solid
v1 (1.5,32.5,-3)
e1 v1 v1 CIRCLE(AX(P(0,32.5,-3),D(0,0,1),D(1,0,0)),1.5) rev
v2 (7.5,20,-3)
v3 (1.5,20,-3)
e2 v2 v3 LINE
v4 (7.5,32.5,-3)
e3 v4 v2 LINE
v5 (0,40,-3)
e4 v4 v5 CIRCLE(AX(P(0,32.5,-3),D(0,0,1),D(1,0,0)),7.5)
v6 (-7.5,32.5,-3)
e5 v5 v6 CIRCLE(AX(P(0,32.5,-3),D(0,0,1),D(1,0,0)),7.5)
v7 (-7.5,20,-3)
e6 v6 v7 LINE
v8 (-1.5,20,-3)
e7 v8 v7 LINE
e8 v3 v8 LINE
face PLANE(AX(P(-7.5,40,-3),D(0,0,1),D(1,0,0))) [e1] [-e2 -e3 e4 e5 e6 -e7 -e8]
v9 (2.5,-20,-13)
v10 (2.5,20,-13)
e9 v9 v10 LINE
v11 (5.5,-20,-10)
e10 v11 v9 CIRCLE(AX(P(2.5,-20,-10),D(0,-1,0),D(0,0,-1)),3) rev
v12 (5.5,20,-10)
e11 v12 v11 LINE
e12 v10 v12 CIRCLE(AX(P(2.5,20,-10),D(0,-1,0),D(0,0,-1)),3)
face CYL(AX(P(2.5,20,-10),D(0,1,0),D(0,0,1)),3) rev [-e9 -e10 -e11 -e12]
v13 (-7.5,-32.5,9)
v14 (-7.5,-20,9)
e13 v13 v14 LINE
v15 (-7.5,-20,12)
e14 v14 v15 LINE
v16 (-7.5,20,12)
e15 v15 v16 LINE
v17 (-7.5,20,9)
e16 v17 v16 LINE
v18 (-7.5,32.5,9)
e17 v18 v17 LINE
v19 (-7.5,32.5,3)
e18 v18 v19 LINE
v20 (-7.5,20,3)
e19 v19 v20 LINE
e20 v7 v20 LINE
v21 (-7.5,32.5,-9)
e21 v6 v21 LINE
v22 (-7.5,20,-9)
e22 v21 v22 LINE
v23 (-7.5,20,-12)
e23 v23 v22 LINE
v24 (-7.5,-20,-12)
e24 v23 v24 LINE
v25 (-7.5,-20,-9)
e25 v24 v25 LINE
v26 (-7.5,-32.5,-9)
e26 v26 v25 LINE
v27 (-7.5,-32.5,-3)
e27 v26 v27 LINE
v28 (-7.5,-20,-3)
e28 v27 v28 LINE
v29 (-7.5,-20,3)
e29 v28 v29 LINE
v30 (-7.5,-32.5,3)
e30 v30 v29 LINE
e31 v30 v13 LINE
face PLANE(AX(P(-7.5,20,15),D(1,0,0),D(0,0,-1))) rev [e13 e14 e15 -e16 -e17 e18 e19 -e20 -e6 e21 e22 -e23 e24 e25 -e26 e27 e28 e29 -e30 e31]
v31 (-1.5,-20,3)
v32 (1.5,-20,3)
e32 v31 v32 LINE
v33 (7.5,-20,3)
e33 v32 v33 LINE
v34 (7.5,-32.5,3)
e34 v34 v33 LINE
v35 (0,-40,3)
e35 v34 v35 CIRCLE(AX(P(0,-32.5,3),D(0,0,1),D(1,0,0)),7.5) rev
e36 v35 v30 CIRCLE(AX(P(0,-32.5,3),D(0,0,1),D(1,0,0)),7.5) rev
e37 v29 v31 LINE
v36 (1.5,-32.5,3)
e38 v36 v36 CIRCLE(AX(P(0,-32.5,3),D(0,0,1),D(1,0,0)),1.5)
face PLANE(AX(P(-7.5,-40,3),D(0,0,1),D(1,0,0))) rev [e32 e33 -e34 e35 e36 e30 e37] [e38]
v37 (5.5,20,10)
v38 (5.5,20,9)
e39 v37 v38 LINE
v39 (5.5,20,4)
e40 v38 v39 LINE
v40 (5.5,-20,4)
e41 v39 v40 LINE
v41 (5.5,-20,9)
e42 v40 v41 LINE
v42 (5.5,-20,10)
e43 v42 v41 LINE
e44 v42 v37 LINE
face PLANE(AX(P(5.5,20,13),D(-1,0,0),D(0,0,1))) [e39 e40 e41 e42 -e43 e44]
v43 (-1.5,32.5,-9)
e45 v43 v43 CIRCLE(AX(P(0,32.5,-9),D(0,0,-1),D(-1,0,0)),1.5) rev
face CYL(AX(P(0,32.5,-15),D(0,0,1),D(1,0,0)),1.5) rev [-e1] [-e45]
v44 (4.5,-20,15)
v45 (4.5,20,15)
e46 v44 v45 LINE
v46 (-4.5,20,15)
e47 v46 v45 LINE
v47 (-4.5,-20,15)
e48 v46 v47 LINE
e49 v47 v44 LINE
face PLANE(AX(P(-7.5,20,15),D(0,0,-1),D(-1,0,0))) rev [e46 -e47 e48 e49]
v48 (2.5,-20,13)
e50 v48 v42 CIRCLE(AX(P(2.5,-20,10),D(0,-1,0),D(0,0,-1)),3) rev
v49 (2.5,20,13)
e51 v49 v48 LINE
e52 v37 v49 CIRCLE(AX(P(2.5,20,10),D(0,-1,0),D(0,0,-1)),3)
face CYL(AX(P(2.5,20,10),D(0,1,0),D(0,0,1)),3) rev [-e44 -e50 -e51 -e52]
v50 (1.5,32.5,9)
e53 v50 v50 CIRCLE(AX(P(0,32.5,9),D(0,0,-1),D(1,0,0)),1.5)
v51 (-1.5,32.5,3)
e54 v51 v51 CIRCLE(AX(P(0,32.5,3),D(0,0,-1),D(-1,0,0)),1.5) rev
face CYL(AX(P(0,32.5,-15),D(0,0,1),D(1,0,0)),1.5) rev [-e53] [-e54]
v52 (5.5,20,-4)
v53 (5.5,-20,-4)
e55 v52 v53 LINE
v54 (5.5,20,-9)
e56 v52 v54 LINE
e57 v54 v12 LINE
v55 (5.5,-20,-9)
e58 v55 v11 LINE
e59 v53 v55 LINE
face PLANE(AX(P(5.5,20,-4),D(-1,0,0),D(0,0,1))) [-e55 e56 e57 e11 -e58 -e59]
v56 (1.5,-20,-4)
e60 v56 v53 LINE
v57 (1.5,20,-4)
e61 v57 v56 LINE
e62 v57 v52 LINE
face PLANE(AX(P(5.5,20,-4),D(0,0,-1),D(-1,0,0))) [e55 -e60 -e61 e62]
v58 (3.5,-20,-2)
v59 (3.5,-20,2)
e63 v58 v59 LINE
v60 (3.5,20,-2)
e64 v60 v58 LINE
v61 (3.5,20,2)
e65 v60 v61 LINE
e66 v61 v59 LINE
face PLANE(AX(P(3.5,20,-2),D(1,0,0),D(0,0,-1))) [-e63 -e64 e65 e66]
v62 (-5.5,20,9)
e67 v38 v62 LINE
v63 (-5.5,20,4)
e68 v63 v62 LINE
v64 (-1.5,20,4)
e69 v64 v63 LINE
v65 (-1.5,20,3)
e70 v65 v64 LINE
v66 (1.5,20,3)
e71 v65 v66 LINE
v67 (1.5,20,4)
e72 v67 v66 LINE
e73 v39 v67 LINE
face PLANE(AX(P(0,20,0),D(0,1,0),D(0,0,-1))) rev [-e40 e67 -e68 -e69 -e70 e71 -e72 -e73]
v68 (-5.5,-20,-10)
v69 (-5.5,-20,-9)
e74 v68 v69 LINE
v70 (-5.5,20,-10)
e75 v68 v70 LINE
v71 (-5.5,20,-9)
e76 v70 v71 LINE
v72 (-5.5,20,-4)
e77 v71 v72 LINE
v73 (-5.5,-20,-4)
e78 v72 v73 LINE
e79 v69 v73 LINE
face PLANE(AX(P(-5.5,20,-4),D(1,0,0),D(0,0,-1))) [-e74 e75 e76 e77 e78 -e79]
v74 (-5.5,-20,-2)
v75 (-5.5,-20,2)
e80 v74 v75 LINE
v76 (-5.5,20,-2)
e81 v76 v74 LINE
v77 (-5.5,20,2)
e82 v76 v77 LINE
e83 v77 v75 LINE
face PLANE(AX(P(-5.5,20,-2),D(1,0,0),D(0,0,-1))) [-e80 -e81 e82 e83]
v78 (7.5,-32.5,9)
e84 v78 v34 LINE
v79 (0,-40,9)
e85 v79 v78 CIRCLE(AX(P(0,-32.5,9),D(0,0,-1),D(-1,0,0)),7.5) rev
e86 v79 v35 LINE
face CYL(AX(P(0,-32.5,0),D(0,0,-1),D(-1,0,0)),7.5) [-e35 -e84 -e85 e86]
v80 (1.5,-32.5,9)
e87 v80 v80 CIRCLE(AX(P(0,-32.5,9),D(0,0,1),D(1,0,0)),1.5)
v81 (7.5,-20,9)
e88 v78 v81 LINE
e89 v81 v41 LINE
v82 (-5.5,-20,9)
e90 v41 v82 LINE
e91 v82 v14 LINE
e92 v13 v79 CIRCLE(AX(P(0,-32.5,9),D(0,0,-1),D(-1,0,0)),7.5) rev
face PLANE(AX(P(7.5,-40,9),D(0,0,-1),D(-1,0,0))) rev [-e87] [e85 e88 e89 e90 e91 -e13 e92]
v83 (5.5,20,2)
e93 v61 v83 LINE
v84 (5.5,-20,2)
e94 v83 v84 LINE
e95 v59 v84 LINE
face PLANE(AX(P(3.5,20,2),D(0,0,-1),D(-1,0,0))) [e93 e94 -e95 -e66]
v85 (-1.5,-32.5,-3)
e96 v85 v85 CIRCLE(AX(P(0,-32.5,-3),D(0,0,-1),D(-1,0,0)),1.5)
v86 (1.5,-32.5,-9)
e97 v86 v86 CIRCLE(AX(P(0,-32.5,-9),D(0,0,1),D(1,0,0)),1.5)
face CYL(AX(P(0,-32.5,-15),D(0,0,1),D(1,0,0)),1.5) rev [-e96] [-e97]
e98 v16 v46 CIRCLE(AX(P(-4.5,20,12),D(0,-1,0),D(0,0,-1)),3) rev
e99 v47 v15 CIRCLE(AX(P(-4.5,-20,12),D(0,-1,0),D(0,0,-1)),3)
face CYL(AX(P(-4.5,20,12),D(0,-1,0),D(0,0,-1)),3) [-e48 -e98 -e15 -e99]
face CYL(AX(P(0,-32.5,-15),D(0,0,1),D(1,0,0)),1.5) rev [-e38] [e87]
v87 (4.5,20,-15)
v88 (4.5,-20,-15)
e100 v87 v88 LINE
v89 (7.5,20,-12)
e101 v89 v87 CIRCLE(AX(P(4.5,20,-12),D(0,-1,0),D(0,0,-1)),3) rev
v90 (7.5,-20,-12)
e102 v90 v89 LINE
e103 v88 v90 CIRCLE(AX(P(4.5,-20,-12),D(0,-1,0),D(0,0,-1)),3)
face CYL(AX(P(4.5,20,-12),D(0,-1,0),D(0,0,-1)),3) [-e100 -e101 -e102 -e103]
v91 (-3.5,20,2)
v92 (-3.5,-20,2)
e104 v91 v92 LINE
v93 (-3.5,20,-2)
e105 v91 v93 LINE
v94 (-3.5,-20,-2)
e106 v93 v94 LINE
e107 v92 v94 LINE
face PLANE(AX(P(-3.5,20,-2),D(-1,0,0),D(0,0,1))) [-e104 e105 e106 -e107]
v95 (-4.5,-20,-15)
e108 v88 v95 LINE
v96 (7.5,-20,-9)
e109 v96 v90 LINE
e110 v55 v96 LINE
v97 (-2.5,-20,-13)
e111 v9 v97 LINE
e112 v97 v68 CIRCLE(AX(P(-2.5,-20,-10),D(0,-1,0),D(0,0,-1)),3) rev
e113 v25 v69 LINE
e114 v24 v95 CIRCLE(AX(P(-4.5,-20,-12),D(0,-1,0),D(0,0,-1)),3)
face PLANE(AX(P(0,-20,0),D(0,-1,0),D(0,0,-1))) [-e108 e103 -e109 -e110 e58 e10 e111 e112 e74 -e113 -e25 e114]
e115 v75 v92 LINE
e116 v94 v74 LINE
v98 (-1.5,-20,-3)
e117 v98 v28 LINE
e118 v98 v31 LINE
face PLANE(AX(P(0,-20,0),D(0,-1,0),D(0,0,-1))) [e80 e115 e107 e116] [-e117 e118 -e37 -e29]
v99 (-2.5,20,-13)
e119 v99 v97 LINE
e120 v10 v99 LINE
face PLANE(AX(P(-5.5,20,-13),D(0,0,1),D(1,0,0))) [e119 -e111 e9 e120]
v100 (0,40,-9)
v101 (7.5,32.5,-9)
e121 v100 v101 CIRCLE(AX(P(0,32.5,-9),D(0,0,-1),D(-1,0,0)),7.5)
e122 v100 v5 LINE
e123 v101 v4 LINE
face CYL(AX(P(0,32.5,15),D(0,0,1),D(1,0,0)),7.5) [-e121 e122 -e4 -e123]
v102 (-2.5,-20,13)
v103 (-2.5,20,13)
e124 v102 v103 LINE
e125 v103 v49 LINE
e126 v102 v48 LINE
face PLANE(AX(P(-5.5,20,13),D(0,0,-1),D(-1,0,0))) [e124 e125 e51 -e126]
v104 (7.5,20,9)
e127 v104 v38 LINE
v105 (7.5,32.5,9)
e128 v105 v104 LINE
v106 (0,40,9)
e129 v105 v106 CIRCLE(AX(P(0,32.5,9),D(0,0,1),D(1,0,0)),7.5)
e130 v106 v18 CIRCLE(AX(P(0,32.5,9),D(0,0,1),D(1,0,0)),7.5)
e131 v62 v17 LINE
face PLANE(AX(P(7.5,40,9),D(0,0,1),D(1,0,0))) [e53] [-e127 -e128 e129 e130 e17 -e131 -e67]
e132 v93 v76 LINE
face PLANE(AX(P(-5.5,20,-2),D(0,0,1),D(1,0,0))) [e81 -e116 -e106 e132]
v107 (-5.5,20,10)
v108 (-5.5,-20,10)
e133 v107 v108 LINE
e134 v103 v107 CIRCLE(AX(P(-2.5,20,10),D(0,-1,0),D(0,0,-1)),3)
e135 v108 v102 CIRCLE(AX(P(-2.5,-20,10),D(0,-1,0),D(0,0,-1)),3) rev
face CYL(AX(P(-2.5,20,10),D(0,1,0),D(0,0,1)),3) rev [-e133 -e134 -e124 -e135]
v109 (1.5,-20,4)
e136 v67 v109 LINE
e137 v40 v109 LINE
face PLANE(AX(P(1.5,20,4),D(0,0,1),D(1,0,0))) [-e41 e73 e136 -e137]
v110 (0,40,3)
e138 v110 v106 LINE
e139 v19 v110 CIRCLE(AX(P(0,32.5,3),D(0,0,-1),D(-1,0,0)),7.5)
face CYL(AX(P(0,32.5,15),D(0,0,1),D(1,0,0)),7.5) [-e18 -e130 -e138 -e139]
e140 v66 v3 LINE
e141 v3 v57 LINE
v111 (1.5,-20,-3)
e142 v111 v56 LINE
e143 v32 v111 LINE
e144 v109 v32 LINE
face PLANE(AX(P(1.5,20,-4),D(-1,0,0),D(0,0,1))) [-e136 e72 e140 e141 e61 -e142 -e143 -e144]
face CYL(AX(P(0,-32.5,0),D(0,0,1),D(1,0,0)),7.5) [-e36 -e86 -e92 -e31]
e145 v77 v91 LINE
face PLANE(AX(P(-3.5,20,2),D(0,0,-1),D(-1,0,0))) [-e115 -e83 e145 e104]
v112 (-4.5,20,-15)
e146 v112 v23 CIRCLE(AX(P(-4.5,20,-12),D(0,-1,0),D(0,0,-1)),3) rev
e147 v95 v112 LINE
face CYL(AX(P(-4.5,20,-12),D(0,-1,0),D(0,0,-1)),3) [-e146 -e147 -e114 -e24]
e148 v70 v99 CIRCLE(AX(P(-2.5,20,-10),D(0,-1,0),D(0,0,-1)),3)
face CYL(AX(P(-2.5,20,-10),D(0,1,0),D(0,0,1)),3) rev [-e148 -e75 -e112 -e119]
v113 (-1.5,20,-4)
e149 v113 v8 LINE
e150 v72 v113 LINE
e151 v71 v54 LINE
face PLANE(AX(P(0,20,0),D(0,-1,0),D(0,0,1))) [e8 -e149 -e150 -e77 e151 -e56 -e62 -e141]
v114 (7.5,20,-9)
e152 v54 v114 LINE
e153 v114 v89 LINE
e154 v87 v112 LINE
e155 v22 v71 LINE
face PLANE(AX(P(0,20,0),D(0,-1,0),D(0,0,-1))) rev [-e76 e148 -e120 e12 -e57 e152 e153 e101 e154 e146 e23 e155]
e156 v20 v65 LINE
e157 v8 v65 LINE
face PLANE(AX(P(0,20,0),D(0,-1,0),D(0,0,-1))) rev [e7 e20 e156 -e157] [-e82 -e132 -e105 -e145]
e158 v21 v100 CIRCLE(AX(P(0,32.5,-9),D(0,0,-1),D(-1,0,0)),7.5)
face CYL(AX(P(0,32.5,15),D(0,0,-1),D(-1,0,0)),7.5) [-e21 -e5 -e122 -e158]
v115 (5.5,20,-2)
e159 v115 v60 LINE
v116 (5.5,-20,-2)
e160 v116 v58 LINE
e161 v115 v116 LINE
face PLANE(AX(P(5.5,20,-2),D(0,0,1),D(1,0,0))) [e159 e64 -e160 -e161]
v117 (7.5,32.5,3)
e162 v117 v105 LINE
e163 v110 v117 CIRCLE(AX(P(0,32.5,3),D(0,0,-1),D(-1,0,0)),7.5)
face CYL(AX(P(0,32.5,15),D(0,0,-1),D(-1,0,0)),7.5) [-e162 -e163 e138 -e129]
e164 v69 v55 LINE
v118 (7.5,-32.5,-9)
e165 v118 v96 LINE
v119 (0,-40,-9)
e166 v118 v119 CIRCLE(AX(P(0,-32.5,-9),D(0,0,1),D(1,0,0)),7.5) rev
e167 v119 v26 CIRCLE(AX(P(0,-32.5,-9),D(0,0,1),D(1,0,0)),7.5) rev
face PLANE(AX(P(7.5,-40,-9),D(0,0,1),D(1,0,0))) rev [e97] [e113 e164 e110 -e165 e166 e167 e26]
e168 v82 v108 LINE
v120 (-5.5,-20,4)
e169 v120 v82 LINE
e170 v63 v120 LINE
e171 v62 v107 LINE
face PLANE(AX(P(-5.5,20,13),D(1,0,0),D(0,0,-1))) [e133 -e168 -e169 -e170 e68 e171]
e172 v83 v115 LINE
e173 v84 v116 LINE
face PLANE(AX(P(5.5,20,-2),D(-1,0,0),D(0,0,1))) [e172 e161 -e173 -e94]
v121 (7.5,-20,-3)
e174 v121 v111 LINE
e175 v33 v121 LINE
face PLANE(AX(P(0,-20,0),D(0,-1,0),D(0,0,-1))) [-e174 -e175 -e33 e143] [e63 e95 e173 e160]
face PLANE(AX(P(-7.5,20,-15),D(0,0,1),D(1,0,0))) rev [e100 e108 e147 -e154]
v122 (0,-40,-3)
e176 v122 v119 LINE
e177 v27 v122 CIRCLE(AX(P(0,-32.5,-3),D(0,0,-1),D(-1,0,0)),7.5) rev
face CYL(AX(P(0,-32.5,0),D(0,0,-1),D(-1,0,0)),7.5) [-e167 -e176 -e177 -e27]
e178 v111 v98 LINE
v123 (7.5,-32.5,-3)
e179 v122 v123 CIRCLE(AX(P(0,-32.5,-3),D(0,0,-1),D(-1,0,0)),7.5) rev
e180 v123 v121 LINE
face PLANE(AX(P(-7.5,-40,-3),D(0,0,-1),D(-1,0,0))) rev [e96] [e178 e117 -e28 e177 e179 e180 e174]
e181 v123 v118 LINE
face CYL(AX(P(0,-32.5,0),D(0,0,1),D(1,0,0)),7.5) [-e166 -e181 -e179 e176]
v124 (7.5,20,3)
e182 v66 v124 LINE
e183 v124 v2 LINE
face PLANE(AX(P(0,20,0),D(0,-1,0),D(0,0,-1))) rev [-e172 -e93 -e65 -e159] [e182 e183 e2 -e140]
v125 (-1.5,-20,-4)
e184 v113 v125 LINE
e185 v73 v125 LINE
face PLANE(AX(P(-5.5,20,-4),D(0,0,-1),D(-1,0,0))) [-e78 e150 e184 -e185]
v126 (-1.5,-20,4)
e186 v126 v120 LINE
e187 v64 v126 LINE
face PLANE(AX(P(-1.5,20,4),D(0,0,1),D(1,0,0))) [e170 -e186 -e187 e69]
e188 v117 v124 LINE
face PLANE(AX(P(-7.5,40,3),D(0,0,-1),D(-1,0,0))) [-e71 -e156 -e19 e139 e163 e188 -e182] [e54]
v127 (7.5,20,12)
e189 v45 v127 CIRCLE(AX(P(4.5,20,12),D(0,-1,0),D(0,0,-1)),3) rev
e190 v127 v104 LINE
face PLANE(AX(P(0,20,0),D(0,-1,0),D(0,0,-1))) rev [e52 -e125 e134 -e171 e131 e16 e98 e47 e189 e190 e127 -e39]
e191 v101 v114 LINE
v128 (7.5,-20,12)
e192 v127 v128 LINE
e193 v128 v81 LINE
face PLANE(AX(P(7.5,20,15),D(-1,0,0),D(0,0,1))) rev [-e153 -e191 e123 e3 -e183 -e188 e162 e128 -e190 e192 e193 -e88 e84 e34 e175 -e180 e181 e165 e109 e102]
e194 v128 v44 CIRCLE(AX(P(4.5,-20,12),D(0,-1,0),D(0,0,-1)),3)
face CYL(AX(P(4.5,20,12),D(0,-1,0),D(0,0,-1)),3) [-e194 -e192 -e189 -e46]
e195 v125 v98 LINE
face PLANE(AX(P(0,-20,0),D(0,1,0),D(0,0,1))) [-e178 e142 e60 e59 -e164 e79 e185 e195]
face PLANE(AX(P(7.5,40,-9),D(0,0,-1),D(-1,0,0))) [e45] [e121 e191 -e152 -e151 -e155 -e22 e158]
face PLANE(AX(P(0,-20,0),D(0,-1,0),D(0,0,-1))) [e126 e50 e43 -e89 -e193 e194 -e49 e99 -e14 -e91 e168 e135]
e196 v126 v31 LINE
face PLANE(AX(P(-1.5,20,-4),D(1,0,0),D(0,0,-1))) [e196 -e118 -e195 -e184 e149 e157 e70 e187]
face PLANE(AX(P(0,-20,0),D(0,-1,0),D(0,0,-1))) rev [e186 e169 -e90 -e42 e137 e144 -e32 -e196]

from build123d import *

# Parameters (mm, degrees)
BOSS_EXTRUDE1_START  = -20
SKETCH1_W            = 15
SKETCH1_H            = 30
SKETCH1_W_2          = 2
SKETCH1_H_2          = 4
BOSS_EXTRUDE1_DEPTH  = 40
SKETCH2_W            = 15
SKETCH2_H            = 6
BOSS_EXTRUDE2_DEPTH  = 20
FILLET1_R            = 7.5
SKETCH3_R            = 1.5
CUT_EXTRUDE1_DEPTH   = 48.246693006
FILLET1_OF_MIRROR1_R = 7.5
FILLET2_R            = 3


with BuildPart() as part:
    # Sketch1 → Boss-Extrude1 (new body)
    with BuildSketch(Plane(origin=(0, 0, 0), x_dir=(1, 0, 0), z_dir=(0, 1, 0)).offset(BOSS_EXTRUDE1_START)):
        Rectangle(SKETCH1_W, SKETCH1_H)
        Polygon((-5.5, -13), (5.5, -13), (5.5, -4), (1.5, -4), (1.5, 4), (5.5, 4), (5.5, 13), (-5.5, 13), (-5.5, 4), (-1.5, 4), (-1.5, -4), (-5.5, -4), align=None, mode=Mode.SUBTRACT)
        with Locations((-4.5, 0)):
            Rectangle(SKETCH1_W_2, SKETCH1_H_2, mode=Mode.SUBTRACT)
        with Locations((4.5, 0)):
            Rectangle(SKETCH1_W_2, SKETCH1_H_2, mode=Mode.SUBTRACT)
    extrude(amount=BOSS_EXTRUDE1_DEPTH)

    # Sketch2 → Boss-Extrude2 (add)
    with BuildSketch(Plane.XZ.offset(20)):
        with Locations((0, 6)):
            Rectangle(SKETCH2_W, SKETCH2_H)
        with Locations((0, -6)):
            Rectangle(SKETCH2_W, SKETCH2_H)
    boss_extrude2 = extrude(amount=BOSS_EXTRUDE2_DEPTH)

    # Fillet1
    fillet1_edges = [part.edges().sort_by_distance(p)[0] for p in [
        (7.5, -40, 6),
        (7.5, -40, -6),
        (-7.5, -40, 6),
        (-7.5, -40, -6),
    ]]
    fillet(fillet1_edges, radius=FILLET1_R - 0.0001)  # a hair under: the kernel refuses the full size

    # Sketch3 → Cut-Extrude1 (cut, through all)
    with BuildSketch(Plane.XY.offset(9)):
        with Locations((0, -32.5)):
            Circle(SKETCH3_R)
    cut_extrude1 = extrude(amount=-CUT_EXTRUDE1_DEPTH, mode=Mode.SUBTRACT)

    # Mirror1: Boss-Extrude2, Cut-Extrude1 across plane
    add(boss_extrude2.mirror(Plane.ZX))
    add(cut_extrude1.mirror(Plane.ZX), mode=Mode.SUBTRACT)

    # Fillet1 of Mirror1
    fillet1_of_mirror1_edges = [part.edges().sort_by_distance(p)[0] for p in [
        (7.5, 40, 6),
        (7.5, 40, -6),
        (-7.5, 40, 6),
        (-7.5, 40, -6),
    ]]
    fillet(fillet1_of_mirror1_edges, radius=FILLET1_OF_MIRROR1_R - 0.0001)  # a hair under: the kernel refuses the full size

    # Fillet2
    fillet2_edges = [part.edges().sort_by_distance(p)[0] for p in [
        (5.5, 0, -13),
        (-5.5, 0, -13),
        (-5.5, 0, 13),
        (5.5, 0, 13),
        (7.5, 0, 15),
        (-7.5, 0, 15),
        (-7.5, 0, -15),
        (7.5, 0, -15),
    ]]
    fillet(fillet2_edges, radius=FILLET2_R)


solid = part.part
